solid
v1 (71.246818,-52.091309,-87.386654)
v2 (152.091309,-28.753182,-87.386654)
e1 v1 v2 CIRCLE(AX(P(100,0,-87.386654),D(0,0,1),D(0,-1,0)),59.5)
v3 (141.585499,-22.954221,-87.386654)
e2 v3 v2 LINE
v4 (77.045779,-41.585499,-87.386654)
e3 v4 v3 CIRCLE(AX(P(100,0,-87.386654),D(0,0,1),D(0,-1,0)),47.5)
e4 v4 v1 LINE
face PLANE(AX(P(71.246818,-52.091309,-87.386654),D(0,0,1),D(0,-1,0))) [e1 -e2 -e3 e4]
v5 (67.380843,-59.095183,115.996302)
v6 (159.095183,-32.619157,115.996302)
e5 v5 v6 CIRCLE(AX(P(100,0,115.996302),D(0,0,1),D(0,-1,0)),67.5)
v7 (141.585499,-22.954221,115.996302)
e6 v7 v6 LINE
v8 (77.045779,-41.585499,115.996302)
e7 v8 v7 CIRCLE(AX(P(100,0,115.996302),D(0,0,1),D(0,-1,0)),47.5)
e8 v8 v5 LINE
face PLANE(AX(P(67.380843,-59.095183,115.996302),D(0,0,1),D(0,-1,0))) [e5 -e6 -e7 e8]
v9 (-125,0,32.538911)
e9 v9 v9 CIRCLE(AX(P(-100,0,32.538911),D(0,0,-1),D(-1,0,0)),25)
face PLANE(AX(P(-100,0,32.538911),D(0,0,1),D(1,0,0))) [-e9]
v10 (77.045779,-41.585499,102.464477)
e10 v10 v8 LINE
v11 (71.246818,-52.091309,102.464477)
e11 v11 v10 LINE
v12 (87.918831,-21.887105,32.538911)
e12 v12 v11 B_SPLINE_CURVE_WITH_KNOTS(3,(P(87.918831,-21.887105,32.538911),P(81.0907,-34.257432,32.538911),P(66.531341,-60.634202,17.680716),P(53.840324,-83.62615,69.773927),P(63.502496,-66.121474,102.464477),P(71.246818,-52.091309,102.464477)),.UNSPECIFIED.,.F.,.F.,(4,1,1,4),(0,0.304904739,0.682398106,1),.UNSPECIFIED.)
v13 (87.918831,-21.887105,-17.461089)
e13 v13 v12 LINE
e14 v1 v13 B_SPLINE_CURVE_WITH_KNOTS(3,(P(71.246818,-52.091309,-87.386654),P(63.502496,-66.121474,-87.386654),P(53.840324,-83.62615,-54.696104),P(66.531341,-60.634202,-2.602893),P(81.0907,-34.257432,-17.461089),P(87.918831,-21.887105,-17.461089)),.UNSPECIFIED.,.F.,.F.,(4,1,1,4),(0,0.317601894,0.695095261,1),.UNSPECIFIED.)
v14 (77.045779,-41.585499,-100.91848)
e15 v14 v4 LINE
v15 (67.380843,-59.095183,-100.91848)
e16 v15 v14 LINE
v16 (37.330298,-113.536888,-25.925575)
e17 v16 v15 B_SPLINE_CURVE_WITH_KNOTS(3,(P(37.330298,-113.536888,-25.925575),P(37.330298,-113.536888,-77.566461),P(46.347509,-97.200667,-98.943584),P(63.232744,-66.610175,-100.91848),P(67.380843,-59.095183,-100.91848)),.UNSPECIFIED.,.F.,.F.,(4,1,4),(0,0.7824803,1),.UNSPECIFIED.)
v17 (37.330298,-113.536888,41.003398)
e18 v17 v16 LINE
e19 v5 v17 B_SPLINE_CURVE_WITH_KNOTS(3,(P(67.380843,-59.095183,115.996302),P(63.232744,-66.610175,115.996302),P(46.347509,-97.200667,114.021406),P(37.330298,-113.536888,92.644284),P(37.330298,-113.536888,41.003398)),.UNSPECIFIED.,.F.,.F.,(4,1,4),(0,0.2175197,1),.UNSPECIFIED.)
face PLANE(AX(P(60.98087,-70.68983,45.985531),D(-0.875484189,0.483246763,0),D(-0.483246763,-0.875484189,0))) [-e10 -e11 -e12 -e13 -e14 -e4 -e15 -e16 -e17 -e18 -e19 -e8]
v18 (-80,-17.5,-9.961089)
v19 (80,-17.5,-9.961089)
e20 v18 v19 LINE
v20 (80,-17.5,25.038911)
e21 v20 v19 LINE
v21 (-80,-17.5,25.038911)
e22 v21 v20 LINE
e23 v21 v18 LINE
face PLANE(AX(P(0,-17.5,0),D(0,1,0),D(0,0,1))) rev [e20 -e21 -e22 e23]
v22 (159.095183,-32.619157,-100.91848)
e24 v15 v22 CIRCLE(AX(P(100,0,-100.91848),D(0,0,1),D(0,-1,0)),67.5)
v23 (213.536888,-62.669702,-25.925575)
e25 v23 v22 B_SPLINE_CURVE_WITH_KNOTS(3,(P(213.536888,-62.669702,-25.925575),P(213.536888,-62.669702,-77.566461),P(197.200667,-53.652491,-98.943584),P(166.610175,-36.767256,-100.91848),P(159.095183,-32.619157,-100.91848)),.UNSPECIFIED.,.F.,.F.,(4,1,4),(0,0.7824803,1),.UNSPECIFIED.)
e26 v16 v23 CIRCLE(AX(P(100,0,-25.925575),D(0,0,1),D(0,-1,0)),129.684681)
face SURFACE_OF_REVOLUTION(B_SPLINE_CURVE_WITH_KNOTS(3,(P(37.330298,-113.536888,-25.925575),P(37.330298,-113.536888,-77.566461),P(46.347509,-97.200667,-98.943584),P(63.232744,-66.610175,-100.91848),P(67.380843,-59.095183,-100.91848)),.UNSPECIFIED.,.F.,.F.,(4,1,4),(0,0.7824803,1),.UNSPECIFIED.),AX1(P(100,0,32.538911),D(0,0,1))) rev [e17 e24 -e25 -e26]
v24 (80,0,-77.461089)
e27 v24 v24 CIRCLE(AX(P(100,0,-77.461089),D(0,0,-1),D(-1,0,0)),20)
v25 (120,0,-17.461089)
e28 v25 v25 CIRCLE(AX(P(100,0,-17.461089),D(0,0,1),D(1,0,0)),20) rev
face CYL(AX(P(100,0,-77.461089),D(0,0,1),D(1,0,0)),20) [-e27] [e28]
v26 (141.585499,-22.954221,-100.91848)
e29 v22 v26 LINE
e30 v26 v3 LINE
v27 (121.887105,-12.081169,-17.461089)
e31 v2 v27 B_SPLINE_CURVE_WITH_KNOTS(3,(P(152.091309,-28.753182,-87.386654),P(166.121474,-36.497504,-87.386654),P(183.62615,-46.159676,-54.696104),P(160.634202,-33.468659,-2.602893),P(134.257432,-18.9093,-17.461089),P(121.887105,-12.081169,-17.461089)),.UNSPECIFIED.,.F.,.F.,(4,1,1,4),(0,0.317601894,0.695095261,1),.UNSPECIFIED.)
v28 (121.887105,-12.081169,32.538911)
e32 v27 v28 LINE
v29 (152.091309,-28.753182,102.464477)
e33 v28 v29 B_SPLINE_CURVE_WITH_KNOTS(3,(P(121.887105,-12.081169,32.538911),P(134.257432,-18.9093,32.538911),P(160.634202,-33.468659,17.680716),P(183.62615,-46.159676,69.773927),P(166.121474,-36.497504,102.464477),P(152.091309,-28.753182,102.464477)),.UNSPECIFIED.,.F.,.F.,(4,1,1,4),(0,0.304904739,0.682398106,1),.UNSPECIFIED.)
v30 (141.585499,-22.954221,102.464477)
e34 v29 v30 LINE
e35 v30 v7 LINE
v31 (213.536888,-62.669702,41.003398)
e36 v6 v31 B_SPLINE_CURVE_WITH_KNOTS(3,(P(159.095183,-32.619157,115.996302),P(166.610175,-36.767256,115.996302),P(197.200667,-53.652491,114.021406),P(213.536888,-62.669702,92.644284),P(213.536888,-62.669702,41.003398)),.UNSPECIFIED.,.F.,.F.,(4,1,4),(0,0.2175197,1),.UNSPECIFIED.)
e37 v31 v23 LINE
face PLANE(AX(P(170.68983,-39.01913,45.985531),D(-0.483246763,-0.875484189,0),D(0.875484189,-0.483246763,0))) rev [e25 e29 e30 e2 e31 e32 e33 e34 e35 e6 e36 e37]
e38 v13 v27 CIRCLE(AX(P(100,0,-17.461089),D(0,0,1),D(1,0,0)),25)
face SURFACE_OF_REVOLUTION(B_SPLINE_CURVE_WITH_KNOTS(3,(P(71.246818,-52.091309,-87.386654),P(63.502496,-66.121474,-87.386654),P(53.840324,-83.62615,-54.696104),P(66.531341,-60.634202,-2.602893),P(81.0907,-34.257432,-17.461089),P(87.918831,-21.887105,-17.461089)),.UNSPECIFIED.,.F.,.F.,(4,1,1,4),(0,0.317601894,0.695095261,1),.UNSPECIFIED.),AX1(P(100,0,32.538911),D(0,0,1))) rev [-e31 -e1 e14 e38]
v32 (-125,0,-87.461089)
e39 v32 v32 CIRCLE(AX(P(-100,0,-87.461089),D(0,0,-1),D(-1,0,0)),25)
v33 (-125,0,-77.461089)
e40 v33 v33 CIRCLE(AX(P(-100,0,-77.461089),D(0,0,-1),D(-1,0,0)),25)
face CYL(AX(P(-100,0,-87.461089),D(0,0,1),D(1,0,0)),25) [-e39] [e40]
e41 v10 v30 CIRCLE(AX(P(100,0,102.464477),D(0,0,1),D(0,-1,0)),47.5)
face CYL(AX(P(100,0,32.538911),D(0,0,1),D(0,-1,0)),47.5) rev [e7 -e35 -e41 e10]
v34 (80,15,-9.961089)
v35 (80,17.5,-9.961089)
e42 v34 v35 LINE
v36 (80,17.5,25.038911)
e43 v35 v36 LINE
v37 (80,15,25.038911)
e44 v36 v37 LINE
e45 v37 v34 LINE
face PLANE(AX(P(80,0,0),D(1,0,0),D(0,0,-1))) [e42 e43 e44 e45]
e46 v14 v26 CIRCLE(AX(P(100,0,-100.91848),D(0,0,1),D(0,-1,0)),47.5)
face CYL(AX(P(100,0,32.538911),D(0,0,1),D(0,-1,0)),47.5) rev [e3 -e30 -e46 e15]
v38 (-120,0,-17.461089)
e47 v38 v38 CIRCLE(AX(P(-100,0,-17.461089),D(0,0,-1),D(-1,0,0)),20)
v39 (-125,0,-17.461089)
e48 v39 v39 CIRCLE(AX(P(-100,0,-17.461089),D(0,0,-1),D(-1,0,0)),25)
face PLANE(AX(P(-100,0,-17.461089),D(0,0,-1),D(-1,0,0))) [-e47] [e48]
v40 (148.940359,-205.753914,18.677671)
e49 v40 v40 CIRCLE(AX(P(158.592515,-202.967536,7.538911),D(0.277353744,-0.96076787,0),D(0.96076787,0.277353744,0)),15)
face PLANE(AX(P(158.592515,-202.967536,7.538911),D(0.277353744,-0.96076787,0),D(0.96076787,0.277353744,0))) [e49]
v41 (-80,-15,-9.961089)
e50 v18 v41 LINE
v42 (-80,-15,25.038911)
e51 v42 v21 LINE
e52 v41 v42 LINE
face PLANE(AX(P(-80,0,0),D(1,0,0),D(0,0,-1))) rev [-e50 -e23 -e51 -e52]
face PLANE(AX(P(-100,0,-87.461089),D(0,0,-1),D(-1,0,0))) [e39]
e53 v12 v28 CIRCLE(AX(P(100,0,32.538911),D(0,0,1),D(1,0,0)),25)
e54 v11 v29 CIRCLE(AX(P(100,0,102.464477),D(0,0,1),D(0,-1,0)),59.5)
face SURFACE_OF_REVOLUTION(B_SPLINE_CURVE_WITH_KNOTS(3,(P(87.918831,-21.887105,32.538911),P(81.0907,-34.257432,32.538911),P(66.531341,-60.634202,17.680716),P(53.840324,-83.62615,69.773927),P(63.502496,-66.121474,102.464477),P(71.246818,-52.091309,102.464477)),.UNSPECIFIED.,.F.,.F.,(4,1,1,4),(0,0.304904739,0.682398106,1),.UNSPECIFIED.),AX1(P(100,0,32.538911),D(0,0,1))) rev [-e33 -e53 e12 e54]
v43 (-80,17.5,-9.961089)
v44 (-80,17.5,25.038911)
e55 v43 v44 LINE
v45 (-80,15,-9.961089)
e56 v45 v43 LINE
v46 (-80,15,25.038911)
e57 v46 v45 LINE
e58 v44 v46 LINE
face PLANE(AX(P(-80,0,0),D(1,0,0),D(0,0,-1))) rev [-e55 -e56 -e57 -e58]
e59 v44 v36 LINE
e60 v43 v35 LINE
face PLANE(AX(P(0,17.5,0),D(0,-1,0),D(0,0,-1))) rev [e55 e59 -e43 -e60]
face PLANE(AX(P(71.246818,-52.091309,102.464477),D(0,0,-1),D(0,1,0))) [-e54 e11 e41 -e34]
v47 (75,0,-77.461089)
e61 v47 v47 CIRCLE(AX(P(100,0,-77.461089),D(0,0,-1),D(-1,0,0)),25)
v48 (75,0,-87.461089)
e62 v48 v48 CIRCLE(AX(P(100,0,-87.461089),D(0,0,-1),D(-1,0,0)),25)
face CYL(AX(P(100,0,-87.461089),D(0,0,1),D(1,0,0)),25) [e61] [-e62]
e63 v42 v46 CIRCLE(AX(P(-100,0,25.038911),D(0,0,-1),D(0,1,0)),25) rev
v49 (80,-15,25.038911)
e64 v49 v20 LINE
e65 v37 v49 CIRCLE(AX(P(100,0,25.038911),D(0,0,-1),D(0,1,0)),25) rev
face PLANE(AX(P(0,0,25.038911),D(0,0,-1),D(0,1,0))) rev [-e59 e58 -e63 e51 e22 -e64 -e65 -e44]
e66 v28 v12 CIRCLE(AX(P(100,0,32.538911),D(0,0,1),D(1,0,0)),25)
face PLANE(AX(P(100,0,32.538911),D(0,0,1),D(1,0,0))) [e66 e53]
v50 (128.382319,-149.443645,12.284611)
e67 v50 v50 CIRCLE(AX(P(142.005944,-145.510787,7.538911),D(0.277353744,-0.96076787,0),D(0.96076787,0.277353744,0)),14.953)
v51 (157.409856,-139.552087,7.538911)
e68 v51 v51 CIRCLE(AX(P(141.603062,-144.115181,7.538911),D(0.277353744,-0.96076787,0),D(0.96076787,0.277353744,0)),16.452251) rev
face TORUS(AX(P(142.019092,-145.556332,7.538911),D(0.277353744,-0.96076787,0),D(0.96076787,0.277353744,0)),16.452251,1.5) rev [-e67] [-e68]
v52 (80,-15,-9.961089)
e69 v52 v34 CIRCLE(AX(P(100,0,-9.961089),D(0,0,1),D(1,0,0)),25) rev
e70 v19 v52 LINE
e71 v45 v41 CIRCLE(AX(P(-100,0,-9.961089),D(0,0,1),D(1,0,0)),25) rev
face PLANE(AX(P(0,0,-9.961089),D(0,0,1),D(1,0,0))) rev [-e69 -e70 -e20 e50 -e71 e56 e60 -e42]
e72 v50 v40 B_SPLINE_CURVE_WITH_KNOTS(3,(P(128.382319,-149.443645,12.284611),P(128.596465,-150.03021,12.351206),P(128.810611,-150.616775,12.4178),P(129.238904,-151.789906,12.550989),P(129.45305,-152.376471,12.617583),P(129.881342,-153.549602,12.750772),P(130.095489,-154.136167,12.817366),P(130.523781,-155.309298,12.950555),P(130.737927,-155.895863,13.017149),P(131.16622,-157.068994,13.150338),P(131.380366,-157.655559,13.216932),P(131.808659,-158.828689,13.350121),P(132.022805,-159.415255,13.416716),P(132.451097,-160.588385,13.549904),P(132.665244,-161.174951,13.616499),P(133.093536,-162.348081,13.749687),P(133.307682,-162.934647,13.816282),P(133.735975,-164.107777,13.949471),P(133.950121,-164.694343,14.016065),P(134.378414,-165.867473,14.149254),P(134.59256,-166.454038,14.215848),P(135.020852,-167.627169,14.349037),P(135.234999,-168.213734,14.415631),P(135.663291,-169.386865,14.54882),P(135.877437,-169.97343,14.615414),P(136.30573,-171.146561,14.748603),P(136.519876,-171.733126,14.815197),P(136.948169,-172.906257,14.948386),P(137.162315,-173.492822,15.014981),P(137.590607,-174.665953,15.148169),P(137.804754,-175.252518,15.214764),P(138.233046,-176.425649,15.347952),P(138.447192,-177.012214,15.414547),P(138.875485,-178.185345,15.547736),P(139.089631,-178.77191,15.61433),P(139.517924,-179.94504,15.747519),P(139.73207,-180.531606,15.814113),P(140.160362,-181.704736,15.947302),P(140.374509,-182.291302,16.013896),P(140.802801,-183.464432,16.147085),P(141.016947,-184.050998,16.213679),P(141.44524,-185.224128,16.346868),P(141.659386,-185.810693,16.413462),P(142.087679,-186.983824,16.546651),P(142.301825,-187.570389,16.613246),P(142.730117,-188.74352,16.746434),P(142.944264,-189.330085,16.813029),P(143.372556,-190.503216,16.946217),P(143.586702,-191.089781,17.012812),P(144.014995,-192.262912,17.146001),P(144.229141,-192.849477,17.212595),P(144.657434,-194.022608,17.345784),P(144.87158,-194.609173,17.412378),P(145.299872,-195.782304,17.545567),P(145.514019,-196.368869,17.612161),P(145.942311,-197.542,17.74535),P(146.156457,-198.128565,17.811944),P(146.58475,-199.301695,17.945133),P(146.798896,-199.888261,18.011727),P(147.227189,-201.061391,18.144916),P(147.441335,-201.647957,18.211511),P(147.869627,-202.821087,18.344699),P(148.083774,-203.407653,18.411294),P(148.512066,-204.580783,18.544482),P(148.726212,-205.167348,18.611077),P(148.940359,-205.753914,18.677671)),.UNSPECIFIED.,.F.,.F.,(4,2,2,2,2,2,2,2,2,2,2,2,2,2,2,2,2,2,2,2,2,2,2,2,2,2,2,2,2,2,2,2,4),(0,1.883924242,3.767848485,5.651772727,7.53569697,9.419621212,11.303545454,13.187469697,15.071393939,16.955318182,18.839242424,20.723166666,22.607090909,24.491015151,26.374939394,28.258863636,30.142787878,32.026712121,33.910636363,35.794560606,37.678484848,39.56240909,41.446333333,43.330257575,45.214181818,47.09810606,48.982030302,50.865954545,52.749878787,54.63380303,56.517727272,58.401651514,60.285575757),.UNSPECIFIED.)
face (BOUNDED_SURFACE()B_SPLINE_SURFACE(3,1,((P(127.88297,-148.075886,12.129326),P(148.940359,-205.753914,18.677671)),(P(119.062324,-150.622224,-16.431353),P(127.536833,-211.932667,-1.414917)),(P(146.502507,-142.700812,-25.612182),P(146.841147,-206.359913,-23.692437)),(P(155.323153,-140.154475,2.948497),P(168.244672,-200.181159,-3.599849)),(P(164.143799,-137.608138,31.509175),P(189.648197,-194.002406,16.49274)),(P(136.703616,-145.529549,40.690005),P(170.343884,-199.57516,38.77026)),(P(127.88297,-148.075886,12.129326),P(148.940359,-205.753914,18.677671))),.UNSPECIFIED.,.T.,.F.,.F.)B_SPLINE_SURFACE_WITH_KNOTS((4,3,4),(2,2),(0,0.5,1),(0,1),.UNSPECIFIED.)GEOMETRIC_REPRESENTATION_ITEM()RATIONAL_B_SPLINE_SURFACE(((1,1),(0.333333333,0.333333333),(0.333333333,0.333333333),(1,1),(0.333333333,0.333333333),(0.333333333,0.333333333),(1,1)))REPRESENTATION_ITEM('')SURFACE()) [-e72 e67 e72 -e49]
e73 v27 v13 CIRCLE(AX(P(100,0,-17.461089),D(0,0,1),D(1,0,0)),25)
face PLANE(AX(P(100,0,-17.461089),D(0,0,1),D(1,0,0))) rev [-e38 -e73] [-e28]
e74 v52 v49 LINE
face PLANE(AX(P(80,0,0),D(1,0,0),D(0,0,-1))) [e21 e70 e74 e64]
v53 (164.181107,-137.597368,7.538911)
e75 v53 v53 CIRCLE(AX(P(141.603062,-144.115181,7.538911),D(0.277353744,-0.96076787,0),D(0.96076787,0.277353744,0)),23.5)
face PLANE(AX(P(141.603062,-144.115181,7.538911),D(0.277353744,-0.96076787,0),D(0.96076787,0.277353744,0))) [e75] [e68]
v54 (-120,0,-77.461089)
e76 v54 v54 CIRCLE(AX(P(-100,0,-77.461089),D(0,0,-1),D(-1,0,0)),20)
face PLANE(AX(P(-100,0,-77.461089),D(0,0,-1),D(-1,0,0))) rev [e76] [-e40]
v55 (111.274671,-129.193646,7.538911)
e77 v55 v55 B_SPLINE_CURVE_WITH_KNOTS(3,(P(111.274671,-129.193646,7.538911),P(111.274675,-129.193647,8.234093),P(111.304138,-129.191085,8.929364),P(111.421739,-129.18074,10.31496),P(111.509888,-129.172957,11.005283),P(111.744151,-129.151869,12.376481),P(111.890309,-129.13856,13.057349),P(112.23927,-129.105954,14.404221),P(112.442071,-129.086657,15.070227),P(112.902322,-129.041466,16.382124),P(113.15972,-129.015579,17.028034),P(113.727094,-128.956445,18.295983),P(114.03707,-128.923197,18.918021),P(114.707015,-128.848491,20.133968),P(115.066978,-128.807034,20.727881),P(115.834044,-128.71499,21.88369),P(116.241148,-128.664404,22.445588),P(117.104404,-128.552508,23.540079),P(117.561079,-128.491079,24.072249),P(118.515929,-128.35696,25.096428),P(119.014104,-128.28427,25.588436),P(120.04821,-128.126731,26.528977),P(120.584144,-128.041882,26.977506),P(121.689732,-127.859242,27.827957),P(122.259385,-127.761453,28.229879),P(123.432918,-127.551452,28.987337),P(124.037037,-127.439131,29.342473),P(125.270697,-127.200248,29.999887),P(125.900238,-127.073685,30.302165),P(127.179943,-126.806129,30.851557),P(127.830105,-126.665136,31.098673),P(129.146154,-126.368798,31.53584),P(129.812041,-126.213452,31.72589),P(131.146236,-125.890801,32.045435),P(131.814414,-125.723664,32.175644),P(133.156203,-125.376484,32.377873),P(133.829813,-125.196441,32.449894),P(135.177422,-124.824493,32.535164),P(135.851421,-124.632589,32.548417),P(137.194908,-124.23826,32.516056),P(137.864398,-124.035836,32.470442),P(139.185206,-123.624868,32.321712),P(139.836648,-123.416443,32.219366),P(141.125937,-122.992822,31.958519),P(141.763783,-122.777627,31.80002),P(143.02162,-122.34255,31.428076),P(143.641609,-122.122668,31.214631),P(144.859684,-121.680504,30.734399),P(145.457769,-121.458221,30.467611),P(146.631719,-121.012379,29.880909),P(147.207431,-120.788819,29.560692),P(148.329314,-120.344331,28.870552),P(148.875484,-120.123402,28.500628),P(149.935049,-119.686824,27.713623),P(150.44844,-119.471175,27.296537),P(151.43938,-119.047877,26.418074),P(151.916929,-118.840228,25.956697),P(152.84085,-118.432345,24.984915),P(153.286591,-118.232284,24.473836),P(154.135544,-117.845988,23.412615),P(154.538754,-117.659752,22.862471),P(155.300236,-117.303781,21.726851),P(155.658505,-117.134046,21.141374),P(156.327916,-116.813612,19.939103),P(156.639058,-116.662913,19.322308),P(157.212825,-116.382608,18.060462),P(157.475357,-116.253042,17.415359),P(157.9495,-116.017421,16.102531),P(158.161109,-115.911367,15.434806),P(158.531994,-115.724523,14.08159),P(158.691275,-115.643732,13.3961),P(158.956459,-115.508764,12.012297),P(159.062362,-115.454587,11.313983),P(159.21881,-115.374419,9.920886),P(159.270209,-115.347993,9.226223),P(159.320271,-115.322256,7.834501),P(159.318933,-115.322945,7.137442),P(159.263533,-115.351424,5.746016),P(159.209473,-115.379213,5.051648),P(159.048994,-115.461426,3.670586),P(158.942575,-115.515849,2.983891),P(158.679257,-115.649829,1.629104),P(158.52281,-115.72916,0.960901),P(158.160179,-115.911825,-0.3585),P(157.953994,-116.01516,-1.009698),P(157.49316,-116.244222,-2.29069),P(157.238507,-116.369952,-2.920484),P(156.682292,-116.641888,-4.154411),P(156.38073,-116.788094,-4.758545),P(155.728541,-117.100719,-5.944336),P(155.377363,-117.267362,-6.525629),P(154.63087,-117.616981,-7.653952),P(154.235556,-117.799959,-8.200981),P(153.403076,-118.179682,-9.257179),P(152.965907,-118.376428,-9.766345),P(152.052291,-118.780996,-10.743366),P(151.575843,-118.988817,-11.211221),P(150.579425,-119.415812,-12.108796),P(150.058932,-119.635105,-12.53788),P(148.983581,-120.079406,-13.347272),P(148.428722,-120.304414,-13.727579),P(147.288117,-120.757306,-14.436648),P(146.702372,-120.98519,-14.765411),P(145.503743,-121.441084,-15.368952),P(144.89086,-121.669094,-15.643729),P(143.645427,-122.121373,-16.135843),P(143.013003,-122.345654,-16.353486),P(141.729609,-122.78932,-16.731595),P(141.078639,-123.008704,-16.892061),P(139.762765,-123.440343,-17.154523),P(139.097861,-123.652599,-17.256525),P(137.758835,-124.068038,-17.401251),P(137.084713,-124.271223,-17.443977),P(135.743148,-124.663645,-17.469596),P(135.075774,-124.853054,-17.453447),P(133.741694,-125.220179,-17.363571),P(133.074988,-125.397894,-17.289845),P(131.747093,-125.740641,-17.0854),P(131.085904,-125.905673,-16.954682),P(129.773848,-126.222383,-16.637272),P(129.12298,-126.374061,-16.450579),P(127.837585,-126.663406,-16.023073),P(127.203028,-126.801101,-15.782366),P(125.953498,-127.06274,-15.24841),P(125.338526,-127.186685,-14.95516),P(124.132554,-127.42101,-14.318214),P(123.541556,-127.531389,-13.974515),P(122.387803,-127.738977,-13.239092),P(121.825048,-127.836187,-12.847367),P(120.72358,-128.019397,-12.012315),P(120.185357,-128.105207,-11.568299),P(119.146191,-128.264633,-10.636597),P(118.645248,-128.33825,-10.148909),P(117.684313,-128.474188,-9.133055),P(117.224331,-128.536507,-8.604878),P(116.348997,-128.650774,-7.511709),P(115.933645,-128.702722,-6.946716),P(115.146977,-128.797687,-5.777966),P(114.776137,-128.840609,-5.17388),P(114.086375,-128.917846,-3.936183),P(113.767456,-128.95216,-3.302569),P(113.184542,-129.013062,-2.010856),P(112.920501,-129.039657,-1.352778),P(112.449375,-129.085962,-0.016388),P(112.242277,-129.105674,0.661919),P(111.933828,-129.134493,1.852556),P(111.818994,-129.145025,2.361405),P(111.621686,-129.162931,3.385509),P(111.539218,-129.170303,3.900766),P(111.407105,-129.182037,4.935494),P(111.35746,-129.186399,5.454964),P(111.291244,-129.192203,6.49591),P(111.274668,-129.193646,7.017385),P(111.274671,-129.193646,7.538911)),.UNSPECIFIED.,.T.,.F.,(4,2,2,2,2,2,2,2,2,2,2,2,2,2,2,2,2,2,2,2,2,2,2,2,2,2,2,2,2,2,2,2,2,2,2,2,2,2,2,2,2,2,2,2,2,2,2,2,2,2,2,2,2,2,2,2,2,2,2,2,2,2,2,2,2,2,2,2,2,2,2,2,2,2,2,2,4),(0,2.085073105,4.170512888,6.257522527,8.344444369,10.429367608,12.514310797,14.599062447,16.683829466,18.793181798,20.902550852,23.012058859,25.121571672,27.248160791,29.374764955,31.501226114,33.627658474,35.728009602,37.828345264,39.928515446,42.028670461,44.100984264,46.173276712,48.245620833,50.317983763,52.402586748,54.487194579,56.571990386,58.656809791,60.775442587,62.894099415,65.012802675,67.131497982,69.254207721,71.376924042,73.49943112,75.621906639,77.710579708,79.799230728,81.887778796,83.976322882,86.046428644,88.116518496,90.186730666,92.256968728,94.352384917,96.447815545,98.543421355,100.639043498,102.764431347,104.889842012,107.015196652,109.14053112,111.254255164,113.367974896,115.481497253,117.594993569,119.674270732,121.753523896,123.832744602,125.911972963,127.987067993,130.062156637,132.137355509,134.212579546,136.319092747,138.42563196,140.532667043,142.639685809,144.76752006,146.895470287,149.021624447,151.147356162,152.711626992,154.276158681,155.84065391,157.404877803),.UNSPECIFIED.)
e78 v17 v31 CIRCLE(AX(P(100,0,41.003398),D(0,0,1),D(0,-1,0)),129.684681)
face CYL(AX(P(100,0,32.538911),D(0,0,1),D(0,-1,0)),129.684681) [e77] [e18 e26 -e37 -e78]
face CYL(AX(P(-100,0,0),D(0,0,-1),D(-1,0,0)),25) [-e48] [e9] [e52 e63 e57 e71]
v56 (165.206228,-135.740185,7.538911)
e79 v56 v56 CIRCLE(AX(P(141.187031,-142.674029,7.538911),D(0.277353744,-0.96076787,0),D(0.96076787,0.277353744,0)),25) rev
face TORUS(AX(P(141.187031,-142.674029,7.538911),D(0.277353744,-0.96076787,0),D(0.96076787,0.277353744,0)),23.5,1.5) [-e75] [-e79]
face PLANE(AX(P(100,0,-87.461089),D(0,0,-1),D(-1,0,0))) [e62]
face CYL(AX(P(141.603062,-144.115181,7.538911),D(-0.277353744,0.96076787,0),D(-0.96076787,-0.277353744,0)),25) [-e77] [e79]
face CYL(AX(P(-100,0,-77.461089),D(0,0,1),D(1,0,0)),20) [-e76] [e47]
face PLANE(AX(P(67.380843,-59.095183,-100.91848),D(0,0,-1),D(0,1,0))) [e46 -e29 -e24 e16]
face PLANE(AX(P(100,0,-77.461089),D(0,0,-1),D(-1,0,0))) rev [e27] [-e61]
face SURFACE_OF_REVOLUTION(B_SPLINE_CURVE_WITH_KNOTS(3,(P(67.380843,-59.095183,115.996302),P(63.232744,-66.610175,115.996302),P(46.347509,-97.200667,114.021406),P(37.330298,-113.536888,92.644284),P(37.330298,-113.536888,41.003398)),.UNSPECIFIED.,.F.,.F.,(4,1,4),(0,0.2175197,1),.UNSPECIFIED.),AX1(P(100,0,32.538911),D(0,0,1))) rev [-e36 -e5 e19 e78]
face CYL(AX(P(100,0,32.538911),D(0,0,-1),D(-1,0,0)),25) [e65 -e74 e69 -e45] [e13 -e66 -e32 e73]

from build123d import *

# Parameters (mm, degrees)
SKETCH10_R          = 25
BOSS_EXTRUDE2_DEPTH = 25
REVOLVE3_ANGLE      = 90
SKETCH19_R          = 25
BOSS_EXTRUDE3_DEPTH = 50
FILLET6_R           = 1.5
SKETCH25_R          = 20
BOSS_EXTRUDE4_DEPTH = 60
BOSS_EXTRUDE5_START = 10
SKETCH26_R          = 25
BOSS_EXTRUDE5_DEPTH = 10
SKETCH27_R          = 20
BOSS_EXTRUDE6_DEPTH = 60
SKETCH28_R          = 25
BOSS_EXTRUDE7_DEPTH = 10


with BuildPart() as part:
    # Sketch3 → Revolve2 (revolve)
    with BuildSketch(Plane(origin=(0, 0, 0), x_dir=(1, 0, 0), z_dir=(0, 1, 0))):
        Polygon((-125, -32.53891123), (-125, 17.46108877), (-100, 17.46108877), (-100, 0), (-100, -15.07782246), (-100, -32.53891123), align=None)
    revolve(axis=Axis((-100, 0, 0), (0, 0, 1)))

    # Sketch6 → Loft2 section 0
    with BuildSketch(Plane(origin=(-80, 0, 0), x_dir=(0, 0, -1), z_dir=(1, 0, 0))):
        with BuildLine():
            Line((9.96108877, -17.5), (-25.03891123, -17.5))
            Line((-25.03891123, -17.5), (-25.03891123, 17.5))
            Line((-25.03891123, 17.5), (9.96108877, 17.5))
            Line((9.96108877, 17.5), (9.96108877, -17.5))
        make_face()
    # Sketch5 → Loft2 section 1
    with BuildSketch(Plane(origin=(80, 0, 0), x_dir=(0, 0, -1), z_dir=(1, 0, 0))):
        with BuildLine():
            Line((9.96108877, -17.5), (-25.03891123, -17.5))
            Line((-25.03891123, -17.5), (-25.03891123, 17.5))
            Line((-25.03891123, 17.5), (9.96108877, 17.5))
            Line((9.96108877, 17.5), (9.96108877, -17.5))
        make_face()
    loft()

    # Sketch10 → Boss-Extrude2 (add, symmetric)
    with BuildSketch(Plane.XY.offset(7.538911233)):
        with Locations((100, 0)):
            Circle(SKETCH10_R)
    extrude(amount=BOSS_EXTRUDE2_DEPTH, both=True)

    # Sketch13 → Revolve3 (revolve, symmetric)
    with BuildSketch(Plane(origin=(92.307490084, 26.647256571, 0), x_dir=(0, 0, -1), z_dir=(0.9607678704250572, 0.27735374372613175, 0))) as revolve3_sk:
        with BuildLine():
            Line((-41.003397863, -157.420055221), (25.925575398, -157.420055221))
            add(Edge.make_bspline(
                [(100.918479625, -95.235374373), (100.918479625, -103.819187393), (98.943583911, -138.760414592), (77.566461401, -157.420055221), (25.925575398, -157.420055221)],
                knots=[0, 0, 0, 0, 0.2175197, 1, 1, 1, 1], degree=3))
            Line((100.918479625, -95.235374373), (100.918479625, -75.235374373))
            Line((100.918479625, -75.235374373), (87.386654253, -75.235374373))
            Line((87.386654253, -75.235374373), (87.386654253, -87.235374373))
            add(Edge.make_bspline(
                [(17.461088767, -52.735374373), (17.461088767, -66.865072707), (2.602893469, -96.99328028), (54.696104455, -123.255260317), (87.386654253, -103.260979897), (87.386654253, -87.235374373)],
                knots=[0, 0, 0, 0, 0.304904739, 0.682398106, 1, 1, 1, 1], degree=3))
            Line((17.461088767, -52.735374373), (-32.538911233, -52.735374373))
            add(Edge.make_bspline(
                [(-32.538911233, -52.735374373), (-32.538911233, -66.865072707), (-17.680715934, -96.99328028), (-69.77392692, -123.255260317), (-102.464476718, -103.260979897), (-102.464476718, -87.235374373)],
                knots=[0, 0, 0, 0, 0.304904739, 0.682398106, 1, 1, 1, 1], degree=3))
            Line((-102.464476718, -87.235374373), (-102.464476718, -75.235374373))
            Line((-102.464476718, -75.235374373), (-115.99630209, -75.235374373))
            Line((-115.99630209, -75.235374373), (-115.99630209, -95.235374373))
            add(Edge.make_bspline(
                [(-115.99630209, -95.235374373), (-115.99630209, -103.819187393), (-114.021406376, -138.760414592), (-92.644283866, -157.420055221), (-41.003397863, -157.420055221)],
                knots=[0, 0, 0, 0, 0.2175197, 1, 1, 1, 1], degree=3))
        make_face()
    revolve(axis=Axis((100, 0, 32.538911233), (0, 0, -1)), revolution_arc=REVOLVE3_ANGLE / 2)
    revolve(revolve3_sk.sketch, axis=Axis((100, 0, 32.538911233), (0, 0, 1)), revolution_arc=REVOLVE3_ANGLE / 2)

    # Sketch19 → Boss-Extrude3 (add)
    with BuildSketch(Plane(origin=(35.427884289, -122.724043613, 0), x_dir=(-0.9607678704226367, -0.27735374373451605, 0), z_dir=(0.27735374373451605, -0.9607678704226368, 0))):
        with Locations((-96.076787042, -7.538911233)):
            Circle(SKETCH19_R)
    extrude(amount=BOSS_EXTRUDE3_DEPTH)

    # Loft4: read off the stored shape, not the designer's step
    # Loft4: loft between two sections, ruled curve by curve
    loft4_from = [
        Edge.make_bspline([(127.882970281, -148.075886157, 12.129325865), (119.062324499, -150.622223525, -16.431352943), (146.502507055, -142.700812334, -25.612182209), (155.323152838, -140.154474966, 2.9484966), (164.14379862, -137.608137599, 31.509175408), (136.703616063, -145.52954879, 40.690004674), (127.882970281, -148.075886157, 12.129325865)], [0, 0, 0, 0, 0.5, 0.5, 0.5, 1, 1, 1, 1], 3, [1, 0.333333333, 0.333333333, 1, 0.333333333, 0.333333333, 1]),
    ]
    loft4_to = [
        Edge.make_bspline([(148.940358563, -205.753913799, 18.677671161), (127.536833252, -211.932667332, -1.41491725), (146.841146631, -206.359912715, -23.692437107), (168.244671942, -200.181159182, -3.599848696), (189.648197253, -194.002405649, 16.492739715), (170.343883874, -199.575160266, 38.770259572), (148.940358563, -205.753913799, 18.677671161)], [0, 0, 0, 0, 0.5, 0.5, 0.5, 1, 1, 1, 1], 3, [1, 0.333333333, 0.333333333, 1, 0.333333333, 0.333333333, 1]),
    ]
    loft4 = Solid(Shell([*[Face.make_surface_from_curves(loft4_from[k], loft4_to[k]) for k in range(1)], Face(Wire(loft4_from)), Face(Wire(loft4_to))]))
    add(loft4)

    # Fillet6
    fillet6_edges = [part.edges().sort_by_distance(p)[0] for p in [
        (165.62225832, -137.181336969, 7.538911233),
        (155.323152838, -140.154474966, 2.9484966),
    ]]
    fillet(fillet6_edges, radius=FILLET6_R)

    # Sketch25 → Boss-Extrude4 (add)
    with BuildSketch(Plane(origin=(0, 0, -17.46108877), x_dir=(-1, 0, 0), z_dir=(0, 0, -1))):
        with Locations((100, 0)):
            Circle(SKETCH25_R)
    extrude(amount=BOSS_EXTRUDE4_DEPTH)

    # Sketch26 → Boss-Extrude5 (add)
    with BuildSketch(Plane(origin=(0, 0, -77.46108877), x_dir=(-1, 0, 0), z_dir=(0, 0, -1)).offset(BOSS_EXTRUDE5_START)):
        with Locations((100, 0)):
            Circle(SKETCH26_R)
    extrude(amount=-BOSS_EXTRUDE5_DEPTH)

    # Sketch27 → Boss-Extrude6 (add)
    with BuildSketch(Plane(origin=(0, 0, -17.461088767), x_dir=(-1, 0, 0), z_dir=(0, 0, -1))):
        with Locations(Location((-100, 0, 0), (0, 0, 180))):
            Circle(SKETCH27_R)
    extrude(amount=BOSS_EXTRUDE6_DEPTH)

    # Sketch28 → Boss-Extrude7 (add)
    with BuildSketch(Plane(origin=(0, 0, -77.461088767), x_dir=(-1, 0, 0), z_dir=(0, 0, -1))):
        with Locations((-100, 0)):
            Circle(SKETCH28_R)
    extrude(amount=BOSS_EXTRUDE7_DEPTH)


solid = part.part
